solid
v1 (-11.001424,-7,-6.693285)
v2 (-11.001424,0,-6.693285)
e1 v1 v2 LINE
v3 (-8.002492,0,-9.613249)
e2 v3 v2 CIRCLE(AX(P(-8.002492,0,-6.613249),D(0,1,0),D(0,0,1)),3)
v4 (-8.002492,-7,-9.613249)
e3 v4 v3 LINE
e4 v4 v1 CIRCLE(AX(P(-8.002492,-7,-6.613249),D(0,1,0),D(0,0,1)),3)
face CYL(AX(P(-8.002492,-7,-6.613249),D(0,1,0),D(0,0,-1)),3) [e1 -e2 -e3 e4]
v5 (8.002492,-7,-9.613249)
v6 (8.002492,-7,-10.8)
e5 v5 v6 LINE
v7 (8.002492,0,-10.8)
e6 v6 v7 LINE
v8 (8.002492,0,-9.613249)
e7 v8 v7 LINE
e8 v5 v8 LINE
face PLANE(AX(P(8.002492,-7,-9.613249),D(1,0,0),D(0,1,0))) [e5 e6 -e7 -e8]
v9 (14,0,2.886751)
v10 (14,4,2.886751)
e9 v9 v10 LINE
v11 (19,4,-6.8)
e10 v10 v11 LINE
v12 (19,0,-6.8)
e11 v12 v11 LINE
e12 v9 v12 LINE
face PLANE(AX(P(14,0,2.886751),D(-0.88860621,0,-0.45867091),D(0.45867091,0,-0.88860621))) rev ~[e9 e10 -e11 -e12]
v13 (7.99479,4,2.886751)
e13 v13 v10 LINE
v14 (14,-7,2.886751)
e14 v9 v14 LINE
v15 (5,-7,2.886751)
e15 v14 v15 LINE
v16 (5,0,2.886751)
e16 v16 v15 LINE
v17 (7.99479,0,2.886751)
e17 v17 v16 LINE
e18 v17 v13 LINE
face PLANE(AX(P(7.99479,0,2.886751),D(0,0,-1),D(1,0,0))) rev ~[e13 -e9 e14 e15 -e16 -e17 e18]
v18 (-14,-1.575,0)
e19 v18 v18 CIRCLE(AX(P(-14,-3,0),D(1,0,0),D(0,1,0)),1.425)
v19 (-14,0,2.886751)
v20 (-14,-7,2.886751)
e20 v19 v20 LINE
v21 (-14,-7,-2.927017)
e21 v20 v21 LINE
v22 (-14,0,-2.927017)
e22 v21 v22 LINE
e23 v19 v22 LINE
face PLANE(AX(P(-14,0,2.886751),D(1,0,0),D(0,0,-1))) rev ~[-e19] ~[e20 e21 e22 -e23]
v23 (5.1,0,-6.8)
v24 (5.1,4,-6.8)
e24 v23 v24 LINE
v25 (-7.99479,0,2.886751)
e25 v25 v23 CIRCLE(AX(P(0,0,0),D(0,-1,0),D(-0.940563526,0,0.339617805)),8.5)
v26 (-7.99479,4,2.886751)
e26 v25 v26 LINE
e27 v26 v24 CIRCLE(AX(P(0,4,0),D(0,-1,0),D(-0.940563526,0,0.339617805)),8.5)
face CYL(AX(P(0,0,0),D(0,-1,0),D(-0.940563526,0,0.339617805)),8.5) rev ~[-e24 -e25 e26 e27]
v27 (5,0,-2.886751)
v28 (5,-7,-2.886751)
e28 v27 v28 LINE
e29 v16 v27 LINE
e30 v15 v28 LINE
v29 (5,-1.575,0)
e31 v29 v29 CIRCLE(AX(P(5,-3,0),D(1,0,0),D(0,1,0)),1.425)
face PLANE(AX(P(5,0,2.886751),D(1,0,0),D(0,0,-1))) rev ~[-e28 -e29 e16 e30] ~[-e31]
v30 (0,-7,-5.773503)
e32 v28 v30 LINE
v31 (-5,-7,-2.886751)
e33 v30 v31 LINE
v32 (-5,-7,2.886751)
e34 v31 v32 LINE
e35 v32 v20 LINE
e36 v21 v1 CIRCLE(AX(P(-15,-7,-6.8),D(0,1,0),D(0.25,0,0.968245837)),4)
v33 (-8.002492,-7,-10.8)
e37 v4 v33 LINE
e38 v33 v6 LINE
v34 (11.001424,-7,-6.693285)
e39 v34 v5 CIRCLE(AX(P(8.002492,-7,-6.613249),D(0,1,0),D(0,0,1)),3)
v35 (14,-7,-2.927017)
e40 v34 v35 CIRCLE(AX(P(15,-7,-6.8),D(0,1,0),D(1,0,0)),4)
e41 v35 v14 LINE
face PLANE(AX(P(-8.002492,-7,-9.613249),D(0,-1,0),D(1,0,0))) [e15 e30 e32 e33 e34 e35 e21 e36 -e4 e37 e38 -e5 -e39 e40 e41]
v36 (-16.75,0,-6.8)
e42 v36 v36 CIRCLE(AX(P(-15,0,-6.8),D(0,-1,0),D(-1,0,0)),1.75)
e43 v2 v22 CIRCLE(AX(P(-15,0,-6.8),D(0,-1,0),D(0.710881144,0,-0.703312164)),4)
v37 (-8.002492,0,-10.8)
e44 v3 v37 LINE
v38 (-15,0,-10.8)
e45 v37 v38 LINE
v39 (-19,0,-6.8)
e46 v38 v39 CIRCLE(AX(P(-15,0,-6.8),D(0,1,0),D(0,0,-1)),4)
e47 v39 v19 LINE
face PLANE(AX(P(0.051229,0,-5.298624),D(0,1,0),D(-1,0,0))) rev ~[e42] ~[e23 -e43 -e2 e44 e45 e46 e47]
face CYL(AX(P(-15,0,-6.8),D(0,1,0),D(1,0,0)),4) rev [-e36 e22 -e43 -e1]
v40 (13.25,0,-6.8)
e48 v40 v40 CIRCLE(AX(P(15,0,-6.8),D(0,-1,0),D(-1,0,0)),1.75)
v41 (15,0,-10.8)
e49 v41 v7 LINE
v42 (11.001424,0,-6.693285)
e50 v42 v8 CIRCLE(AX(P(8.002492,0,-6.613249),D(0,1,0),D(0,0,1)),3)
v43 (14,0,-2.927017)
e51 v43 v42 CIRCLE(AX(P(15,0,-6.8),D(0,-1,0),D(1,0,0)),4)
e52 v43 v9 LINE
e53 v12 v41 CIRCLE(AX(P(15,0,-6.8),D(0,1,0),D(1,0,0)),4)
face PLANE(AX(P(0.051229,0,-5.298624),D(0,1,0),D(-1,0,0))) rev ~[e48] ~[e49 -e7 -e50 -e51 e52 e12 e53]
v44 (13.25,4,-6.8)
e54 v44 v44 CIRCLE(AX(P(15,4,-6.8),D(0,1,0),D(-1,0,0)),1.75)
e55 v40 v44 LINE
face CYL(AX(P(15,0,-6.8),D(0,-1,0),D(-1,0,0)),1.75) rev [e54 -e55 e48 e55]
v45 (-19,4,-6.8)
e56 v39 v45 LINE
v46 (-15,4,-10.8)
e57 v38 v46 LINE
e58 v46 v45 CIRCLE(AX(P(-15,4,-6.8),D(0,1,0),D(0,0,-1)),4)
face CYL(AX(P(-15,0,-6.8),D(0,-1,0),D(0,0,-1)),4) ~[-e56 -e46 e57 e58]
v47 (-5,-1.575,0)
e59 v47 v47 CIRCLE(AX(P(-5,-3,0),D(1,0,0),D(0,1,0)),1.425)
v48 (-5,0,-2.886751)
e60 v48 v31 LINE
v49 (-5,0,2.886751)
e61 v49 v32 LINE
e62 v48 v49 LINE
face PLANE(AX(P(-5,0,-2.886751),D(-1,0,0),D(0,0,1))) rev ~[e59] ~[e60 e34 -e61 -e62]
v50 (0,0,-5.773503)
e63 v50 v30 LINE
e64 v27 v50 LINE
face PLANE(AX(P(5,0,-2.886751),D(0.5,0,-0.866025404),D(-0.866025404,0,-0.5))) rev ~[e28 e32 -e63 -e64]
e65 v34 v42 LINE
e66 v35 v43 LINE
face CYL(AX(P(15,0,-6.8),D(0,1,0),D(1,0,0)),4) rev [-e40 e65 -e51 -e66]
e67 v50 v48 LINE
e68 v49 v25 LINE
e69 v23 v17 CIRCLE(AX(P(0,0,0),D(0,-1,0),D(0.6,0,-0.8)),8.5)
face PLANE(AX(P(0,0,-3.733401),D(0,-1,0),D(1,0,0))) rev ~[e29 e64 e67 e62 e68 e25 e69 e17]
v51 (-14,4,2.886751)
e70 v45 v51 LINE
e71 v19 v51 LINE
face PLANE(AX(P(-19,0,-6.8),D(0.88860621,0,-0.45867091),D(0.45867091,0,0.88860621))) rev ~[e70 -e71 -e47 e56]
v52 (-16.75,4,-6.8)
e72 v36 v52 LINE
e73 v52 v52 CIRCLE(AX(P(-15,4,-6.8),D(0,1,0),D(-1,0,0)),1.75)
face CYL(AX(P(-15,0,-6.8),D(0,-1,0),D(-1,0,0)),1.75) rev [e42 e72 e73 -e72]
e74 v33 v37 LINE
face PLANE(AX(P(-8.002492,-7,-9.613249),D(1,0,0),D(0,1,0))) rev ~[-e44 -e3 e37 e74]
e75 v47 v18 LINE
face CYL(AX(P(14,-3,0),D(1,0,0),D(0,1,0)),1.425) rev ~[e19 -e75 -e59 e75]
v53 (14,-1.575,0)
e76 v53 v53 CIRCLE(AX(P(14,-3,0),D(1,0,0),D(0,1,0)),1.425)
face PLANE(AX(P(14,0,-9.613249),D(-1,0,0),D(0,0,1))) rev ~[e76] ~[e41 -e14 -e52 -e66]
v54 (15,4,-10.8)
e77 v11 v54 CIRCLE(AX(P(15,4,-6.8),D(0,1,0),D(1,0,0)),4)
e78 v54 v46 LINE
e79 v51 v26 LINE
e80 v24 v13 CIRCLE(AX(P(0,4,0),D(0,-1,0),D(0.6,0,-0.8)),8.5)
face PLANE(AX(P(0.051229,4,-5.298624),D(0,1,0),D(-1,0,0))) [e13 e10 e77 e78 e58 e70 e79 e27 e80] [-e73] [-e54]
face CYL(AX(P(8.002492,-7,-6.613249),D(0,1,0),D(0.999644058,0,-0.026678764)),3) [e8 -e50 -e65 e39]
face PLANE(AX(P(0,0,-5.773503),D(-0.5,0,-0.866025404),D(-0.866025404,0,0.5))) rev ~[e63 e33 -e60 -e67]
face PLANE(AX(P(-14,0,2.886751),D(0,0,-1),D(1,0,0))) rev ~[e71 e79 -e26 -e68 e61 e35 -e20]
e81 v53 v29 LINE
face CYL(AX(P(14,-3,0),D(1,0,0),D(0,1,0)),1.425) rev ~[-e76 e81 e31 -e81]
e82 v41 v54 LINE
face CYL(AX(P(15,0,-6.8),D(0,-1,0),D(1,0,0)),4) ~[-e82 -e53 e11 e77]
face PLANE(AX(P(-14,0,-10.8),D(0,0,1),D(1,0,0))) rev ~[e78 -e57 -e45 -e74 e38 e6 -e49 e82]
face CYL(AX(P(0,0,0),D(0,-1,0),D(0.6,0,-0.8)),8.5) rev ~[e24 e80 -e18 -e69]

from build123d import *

# Parameters (mm, degrees)
F1_DEPTH = 7
F3_DEPTH = 34.2
F4_R     = 1.75
F5_DEPTH = 4
F6_R     = 4
F7_DEPTH = 25
F8_R     = 3
F9_DEPTH = 1.1867513459


with BuildPart() as f1:
    # F0 (on Front) → F1 (new body)
    with BuildSketch(Plane.XZ):
        Polygon((14, 2.8867513459), (5, 2.8867513459), (5, -2.8867513459), (0, -5.7735026919), (-5, -2.8867513459), (-5, 2.8867513459), (-14, 2.8867513459), (-14, -9.6132486541), (14, -9.6132486541), align=None)
    extrude(amount=F1_DEPTH)

    # F2 (on face) → F3 (cut)
    with BuildSketch(Plane.YZ.offset(14)):
        with BuildLine():
            ThreePointArc((-4.425, 0), (-3, -1.425), (-1.575, 0))
            Line((-1.575, 0), (-4.425, 0))
        make_face()
        with BuildLine():
            Line((-4.425, 0), (-1.575, 0))
            ThreePointArc((-1.575, 0), (-3, 1.425), (-4.425, 0))
        make_face()
    extrude(amount=-F3_DEPTH, mode=Mode.SUBTRACT)

    # F4 (on face) → F5 (join)
    with BuildSketch(Plane(origin=(0, 0, 0), x_dir=(-1, 0, 0), z_dir=(0, 1, 0))):
        with BuildLine():
            ThreePointArc((-5.1, -6.8), (-8.1441186755, -2.4337894321), (-7.9947899701, 2.8867513459))
            Line((-7.9947899701, 2.8867513459), (-14, 2.8867513459))
            Line((-14, 2.8867513459), (-19, -6.8))
            ThreePointArc((-19, -6.8), (-17.8284271247, -9.6284271247), (-15, -10.8))
            Line((-15, -10.8), (15, -10.8))
            ThreePointArc((15, -10.8), (17.8284271247, -9.6284271247), (19, -6.8))
            Line((19, -6.8), (14, 2.8867513459))
            Line((14, 2.8867513459), (7.9947899701, 2.8867513459))
            ThreePointArc((7.9947899701, 2.8867513459), (5.0550212811, -6.833502751), (-5.1, -6.8))
        make_face()
        with Locations((-15, -6.8)):
            Circle(F4_R, mode=Mode.SUBTRACT)
        with Locations((15, -6.8)):
            Circle(F4_R, mode=Mode.SUBTRACT)
    extrude(amount=F5_DEPTH)

    # F6 (on face) → F7 (cut)
    with BuildSketch(Plane.XZ):
        with Locations((-15, -6.8)):
            Circle(F6_R)
        with Locations((15, -6.8)):
            Circle(F6_R)
    extrude(amount=F7_DEPTH, mode=Mode.SUBTRACT)

    # F8
    f8_edges = [f1.edges().sort_by_distance(p)[0] for p in [
        (-12.156475, -3.5, -9.613249),
        (12.156475, -3.5, -9.613249),
    ]]
    fillet(f8_edges, radius=F8_R)

    # F9 (add, through all): a face of the model
    f9_faces = [f1.faces().sort_by_distance(p)[0] for p in [
        (0, -3.5, -9.6132486541),
    ]]
    extrude(f9_faces, amount=F9_DEPTH)


solid = f1.part
